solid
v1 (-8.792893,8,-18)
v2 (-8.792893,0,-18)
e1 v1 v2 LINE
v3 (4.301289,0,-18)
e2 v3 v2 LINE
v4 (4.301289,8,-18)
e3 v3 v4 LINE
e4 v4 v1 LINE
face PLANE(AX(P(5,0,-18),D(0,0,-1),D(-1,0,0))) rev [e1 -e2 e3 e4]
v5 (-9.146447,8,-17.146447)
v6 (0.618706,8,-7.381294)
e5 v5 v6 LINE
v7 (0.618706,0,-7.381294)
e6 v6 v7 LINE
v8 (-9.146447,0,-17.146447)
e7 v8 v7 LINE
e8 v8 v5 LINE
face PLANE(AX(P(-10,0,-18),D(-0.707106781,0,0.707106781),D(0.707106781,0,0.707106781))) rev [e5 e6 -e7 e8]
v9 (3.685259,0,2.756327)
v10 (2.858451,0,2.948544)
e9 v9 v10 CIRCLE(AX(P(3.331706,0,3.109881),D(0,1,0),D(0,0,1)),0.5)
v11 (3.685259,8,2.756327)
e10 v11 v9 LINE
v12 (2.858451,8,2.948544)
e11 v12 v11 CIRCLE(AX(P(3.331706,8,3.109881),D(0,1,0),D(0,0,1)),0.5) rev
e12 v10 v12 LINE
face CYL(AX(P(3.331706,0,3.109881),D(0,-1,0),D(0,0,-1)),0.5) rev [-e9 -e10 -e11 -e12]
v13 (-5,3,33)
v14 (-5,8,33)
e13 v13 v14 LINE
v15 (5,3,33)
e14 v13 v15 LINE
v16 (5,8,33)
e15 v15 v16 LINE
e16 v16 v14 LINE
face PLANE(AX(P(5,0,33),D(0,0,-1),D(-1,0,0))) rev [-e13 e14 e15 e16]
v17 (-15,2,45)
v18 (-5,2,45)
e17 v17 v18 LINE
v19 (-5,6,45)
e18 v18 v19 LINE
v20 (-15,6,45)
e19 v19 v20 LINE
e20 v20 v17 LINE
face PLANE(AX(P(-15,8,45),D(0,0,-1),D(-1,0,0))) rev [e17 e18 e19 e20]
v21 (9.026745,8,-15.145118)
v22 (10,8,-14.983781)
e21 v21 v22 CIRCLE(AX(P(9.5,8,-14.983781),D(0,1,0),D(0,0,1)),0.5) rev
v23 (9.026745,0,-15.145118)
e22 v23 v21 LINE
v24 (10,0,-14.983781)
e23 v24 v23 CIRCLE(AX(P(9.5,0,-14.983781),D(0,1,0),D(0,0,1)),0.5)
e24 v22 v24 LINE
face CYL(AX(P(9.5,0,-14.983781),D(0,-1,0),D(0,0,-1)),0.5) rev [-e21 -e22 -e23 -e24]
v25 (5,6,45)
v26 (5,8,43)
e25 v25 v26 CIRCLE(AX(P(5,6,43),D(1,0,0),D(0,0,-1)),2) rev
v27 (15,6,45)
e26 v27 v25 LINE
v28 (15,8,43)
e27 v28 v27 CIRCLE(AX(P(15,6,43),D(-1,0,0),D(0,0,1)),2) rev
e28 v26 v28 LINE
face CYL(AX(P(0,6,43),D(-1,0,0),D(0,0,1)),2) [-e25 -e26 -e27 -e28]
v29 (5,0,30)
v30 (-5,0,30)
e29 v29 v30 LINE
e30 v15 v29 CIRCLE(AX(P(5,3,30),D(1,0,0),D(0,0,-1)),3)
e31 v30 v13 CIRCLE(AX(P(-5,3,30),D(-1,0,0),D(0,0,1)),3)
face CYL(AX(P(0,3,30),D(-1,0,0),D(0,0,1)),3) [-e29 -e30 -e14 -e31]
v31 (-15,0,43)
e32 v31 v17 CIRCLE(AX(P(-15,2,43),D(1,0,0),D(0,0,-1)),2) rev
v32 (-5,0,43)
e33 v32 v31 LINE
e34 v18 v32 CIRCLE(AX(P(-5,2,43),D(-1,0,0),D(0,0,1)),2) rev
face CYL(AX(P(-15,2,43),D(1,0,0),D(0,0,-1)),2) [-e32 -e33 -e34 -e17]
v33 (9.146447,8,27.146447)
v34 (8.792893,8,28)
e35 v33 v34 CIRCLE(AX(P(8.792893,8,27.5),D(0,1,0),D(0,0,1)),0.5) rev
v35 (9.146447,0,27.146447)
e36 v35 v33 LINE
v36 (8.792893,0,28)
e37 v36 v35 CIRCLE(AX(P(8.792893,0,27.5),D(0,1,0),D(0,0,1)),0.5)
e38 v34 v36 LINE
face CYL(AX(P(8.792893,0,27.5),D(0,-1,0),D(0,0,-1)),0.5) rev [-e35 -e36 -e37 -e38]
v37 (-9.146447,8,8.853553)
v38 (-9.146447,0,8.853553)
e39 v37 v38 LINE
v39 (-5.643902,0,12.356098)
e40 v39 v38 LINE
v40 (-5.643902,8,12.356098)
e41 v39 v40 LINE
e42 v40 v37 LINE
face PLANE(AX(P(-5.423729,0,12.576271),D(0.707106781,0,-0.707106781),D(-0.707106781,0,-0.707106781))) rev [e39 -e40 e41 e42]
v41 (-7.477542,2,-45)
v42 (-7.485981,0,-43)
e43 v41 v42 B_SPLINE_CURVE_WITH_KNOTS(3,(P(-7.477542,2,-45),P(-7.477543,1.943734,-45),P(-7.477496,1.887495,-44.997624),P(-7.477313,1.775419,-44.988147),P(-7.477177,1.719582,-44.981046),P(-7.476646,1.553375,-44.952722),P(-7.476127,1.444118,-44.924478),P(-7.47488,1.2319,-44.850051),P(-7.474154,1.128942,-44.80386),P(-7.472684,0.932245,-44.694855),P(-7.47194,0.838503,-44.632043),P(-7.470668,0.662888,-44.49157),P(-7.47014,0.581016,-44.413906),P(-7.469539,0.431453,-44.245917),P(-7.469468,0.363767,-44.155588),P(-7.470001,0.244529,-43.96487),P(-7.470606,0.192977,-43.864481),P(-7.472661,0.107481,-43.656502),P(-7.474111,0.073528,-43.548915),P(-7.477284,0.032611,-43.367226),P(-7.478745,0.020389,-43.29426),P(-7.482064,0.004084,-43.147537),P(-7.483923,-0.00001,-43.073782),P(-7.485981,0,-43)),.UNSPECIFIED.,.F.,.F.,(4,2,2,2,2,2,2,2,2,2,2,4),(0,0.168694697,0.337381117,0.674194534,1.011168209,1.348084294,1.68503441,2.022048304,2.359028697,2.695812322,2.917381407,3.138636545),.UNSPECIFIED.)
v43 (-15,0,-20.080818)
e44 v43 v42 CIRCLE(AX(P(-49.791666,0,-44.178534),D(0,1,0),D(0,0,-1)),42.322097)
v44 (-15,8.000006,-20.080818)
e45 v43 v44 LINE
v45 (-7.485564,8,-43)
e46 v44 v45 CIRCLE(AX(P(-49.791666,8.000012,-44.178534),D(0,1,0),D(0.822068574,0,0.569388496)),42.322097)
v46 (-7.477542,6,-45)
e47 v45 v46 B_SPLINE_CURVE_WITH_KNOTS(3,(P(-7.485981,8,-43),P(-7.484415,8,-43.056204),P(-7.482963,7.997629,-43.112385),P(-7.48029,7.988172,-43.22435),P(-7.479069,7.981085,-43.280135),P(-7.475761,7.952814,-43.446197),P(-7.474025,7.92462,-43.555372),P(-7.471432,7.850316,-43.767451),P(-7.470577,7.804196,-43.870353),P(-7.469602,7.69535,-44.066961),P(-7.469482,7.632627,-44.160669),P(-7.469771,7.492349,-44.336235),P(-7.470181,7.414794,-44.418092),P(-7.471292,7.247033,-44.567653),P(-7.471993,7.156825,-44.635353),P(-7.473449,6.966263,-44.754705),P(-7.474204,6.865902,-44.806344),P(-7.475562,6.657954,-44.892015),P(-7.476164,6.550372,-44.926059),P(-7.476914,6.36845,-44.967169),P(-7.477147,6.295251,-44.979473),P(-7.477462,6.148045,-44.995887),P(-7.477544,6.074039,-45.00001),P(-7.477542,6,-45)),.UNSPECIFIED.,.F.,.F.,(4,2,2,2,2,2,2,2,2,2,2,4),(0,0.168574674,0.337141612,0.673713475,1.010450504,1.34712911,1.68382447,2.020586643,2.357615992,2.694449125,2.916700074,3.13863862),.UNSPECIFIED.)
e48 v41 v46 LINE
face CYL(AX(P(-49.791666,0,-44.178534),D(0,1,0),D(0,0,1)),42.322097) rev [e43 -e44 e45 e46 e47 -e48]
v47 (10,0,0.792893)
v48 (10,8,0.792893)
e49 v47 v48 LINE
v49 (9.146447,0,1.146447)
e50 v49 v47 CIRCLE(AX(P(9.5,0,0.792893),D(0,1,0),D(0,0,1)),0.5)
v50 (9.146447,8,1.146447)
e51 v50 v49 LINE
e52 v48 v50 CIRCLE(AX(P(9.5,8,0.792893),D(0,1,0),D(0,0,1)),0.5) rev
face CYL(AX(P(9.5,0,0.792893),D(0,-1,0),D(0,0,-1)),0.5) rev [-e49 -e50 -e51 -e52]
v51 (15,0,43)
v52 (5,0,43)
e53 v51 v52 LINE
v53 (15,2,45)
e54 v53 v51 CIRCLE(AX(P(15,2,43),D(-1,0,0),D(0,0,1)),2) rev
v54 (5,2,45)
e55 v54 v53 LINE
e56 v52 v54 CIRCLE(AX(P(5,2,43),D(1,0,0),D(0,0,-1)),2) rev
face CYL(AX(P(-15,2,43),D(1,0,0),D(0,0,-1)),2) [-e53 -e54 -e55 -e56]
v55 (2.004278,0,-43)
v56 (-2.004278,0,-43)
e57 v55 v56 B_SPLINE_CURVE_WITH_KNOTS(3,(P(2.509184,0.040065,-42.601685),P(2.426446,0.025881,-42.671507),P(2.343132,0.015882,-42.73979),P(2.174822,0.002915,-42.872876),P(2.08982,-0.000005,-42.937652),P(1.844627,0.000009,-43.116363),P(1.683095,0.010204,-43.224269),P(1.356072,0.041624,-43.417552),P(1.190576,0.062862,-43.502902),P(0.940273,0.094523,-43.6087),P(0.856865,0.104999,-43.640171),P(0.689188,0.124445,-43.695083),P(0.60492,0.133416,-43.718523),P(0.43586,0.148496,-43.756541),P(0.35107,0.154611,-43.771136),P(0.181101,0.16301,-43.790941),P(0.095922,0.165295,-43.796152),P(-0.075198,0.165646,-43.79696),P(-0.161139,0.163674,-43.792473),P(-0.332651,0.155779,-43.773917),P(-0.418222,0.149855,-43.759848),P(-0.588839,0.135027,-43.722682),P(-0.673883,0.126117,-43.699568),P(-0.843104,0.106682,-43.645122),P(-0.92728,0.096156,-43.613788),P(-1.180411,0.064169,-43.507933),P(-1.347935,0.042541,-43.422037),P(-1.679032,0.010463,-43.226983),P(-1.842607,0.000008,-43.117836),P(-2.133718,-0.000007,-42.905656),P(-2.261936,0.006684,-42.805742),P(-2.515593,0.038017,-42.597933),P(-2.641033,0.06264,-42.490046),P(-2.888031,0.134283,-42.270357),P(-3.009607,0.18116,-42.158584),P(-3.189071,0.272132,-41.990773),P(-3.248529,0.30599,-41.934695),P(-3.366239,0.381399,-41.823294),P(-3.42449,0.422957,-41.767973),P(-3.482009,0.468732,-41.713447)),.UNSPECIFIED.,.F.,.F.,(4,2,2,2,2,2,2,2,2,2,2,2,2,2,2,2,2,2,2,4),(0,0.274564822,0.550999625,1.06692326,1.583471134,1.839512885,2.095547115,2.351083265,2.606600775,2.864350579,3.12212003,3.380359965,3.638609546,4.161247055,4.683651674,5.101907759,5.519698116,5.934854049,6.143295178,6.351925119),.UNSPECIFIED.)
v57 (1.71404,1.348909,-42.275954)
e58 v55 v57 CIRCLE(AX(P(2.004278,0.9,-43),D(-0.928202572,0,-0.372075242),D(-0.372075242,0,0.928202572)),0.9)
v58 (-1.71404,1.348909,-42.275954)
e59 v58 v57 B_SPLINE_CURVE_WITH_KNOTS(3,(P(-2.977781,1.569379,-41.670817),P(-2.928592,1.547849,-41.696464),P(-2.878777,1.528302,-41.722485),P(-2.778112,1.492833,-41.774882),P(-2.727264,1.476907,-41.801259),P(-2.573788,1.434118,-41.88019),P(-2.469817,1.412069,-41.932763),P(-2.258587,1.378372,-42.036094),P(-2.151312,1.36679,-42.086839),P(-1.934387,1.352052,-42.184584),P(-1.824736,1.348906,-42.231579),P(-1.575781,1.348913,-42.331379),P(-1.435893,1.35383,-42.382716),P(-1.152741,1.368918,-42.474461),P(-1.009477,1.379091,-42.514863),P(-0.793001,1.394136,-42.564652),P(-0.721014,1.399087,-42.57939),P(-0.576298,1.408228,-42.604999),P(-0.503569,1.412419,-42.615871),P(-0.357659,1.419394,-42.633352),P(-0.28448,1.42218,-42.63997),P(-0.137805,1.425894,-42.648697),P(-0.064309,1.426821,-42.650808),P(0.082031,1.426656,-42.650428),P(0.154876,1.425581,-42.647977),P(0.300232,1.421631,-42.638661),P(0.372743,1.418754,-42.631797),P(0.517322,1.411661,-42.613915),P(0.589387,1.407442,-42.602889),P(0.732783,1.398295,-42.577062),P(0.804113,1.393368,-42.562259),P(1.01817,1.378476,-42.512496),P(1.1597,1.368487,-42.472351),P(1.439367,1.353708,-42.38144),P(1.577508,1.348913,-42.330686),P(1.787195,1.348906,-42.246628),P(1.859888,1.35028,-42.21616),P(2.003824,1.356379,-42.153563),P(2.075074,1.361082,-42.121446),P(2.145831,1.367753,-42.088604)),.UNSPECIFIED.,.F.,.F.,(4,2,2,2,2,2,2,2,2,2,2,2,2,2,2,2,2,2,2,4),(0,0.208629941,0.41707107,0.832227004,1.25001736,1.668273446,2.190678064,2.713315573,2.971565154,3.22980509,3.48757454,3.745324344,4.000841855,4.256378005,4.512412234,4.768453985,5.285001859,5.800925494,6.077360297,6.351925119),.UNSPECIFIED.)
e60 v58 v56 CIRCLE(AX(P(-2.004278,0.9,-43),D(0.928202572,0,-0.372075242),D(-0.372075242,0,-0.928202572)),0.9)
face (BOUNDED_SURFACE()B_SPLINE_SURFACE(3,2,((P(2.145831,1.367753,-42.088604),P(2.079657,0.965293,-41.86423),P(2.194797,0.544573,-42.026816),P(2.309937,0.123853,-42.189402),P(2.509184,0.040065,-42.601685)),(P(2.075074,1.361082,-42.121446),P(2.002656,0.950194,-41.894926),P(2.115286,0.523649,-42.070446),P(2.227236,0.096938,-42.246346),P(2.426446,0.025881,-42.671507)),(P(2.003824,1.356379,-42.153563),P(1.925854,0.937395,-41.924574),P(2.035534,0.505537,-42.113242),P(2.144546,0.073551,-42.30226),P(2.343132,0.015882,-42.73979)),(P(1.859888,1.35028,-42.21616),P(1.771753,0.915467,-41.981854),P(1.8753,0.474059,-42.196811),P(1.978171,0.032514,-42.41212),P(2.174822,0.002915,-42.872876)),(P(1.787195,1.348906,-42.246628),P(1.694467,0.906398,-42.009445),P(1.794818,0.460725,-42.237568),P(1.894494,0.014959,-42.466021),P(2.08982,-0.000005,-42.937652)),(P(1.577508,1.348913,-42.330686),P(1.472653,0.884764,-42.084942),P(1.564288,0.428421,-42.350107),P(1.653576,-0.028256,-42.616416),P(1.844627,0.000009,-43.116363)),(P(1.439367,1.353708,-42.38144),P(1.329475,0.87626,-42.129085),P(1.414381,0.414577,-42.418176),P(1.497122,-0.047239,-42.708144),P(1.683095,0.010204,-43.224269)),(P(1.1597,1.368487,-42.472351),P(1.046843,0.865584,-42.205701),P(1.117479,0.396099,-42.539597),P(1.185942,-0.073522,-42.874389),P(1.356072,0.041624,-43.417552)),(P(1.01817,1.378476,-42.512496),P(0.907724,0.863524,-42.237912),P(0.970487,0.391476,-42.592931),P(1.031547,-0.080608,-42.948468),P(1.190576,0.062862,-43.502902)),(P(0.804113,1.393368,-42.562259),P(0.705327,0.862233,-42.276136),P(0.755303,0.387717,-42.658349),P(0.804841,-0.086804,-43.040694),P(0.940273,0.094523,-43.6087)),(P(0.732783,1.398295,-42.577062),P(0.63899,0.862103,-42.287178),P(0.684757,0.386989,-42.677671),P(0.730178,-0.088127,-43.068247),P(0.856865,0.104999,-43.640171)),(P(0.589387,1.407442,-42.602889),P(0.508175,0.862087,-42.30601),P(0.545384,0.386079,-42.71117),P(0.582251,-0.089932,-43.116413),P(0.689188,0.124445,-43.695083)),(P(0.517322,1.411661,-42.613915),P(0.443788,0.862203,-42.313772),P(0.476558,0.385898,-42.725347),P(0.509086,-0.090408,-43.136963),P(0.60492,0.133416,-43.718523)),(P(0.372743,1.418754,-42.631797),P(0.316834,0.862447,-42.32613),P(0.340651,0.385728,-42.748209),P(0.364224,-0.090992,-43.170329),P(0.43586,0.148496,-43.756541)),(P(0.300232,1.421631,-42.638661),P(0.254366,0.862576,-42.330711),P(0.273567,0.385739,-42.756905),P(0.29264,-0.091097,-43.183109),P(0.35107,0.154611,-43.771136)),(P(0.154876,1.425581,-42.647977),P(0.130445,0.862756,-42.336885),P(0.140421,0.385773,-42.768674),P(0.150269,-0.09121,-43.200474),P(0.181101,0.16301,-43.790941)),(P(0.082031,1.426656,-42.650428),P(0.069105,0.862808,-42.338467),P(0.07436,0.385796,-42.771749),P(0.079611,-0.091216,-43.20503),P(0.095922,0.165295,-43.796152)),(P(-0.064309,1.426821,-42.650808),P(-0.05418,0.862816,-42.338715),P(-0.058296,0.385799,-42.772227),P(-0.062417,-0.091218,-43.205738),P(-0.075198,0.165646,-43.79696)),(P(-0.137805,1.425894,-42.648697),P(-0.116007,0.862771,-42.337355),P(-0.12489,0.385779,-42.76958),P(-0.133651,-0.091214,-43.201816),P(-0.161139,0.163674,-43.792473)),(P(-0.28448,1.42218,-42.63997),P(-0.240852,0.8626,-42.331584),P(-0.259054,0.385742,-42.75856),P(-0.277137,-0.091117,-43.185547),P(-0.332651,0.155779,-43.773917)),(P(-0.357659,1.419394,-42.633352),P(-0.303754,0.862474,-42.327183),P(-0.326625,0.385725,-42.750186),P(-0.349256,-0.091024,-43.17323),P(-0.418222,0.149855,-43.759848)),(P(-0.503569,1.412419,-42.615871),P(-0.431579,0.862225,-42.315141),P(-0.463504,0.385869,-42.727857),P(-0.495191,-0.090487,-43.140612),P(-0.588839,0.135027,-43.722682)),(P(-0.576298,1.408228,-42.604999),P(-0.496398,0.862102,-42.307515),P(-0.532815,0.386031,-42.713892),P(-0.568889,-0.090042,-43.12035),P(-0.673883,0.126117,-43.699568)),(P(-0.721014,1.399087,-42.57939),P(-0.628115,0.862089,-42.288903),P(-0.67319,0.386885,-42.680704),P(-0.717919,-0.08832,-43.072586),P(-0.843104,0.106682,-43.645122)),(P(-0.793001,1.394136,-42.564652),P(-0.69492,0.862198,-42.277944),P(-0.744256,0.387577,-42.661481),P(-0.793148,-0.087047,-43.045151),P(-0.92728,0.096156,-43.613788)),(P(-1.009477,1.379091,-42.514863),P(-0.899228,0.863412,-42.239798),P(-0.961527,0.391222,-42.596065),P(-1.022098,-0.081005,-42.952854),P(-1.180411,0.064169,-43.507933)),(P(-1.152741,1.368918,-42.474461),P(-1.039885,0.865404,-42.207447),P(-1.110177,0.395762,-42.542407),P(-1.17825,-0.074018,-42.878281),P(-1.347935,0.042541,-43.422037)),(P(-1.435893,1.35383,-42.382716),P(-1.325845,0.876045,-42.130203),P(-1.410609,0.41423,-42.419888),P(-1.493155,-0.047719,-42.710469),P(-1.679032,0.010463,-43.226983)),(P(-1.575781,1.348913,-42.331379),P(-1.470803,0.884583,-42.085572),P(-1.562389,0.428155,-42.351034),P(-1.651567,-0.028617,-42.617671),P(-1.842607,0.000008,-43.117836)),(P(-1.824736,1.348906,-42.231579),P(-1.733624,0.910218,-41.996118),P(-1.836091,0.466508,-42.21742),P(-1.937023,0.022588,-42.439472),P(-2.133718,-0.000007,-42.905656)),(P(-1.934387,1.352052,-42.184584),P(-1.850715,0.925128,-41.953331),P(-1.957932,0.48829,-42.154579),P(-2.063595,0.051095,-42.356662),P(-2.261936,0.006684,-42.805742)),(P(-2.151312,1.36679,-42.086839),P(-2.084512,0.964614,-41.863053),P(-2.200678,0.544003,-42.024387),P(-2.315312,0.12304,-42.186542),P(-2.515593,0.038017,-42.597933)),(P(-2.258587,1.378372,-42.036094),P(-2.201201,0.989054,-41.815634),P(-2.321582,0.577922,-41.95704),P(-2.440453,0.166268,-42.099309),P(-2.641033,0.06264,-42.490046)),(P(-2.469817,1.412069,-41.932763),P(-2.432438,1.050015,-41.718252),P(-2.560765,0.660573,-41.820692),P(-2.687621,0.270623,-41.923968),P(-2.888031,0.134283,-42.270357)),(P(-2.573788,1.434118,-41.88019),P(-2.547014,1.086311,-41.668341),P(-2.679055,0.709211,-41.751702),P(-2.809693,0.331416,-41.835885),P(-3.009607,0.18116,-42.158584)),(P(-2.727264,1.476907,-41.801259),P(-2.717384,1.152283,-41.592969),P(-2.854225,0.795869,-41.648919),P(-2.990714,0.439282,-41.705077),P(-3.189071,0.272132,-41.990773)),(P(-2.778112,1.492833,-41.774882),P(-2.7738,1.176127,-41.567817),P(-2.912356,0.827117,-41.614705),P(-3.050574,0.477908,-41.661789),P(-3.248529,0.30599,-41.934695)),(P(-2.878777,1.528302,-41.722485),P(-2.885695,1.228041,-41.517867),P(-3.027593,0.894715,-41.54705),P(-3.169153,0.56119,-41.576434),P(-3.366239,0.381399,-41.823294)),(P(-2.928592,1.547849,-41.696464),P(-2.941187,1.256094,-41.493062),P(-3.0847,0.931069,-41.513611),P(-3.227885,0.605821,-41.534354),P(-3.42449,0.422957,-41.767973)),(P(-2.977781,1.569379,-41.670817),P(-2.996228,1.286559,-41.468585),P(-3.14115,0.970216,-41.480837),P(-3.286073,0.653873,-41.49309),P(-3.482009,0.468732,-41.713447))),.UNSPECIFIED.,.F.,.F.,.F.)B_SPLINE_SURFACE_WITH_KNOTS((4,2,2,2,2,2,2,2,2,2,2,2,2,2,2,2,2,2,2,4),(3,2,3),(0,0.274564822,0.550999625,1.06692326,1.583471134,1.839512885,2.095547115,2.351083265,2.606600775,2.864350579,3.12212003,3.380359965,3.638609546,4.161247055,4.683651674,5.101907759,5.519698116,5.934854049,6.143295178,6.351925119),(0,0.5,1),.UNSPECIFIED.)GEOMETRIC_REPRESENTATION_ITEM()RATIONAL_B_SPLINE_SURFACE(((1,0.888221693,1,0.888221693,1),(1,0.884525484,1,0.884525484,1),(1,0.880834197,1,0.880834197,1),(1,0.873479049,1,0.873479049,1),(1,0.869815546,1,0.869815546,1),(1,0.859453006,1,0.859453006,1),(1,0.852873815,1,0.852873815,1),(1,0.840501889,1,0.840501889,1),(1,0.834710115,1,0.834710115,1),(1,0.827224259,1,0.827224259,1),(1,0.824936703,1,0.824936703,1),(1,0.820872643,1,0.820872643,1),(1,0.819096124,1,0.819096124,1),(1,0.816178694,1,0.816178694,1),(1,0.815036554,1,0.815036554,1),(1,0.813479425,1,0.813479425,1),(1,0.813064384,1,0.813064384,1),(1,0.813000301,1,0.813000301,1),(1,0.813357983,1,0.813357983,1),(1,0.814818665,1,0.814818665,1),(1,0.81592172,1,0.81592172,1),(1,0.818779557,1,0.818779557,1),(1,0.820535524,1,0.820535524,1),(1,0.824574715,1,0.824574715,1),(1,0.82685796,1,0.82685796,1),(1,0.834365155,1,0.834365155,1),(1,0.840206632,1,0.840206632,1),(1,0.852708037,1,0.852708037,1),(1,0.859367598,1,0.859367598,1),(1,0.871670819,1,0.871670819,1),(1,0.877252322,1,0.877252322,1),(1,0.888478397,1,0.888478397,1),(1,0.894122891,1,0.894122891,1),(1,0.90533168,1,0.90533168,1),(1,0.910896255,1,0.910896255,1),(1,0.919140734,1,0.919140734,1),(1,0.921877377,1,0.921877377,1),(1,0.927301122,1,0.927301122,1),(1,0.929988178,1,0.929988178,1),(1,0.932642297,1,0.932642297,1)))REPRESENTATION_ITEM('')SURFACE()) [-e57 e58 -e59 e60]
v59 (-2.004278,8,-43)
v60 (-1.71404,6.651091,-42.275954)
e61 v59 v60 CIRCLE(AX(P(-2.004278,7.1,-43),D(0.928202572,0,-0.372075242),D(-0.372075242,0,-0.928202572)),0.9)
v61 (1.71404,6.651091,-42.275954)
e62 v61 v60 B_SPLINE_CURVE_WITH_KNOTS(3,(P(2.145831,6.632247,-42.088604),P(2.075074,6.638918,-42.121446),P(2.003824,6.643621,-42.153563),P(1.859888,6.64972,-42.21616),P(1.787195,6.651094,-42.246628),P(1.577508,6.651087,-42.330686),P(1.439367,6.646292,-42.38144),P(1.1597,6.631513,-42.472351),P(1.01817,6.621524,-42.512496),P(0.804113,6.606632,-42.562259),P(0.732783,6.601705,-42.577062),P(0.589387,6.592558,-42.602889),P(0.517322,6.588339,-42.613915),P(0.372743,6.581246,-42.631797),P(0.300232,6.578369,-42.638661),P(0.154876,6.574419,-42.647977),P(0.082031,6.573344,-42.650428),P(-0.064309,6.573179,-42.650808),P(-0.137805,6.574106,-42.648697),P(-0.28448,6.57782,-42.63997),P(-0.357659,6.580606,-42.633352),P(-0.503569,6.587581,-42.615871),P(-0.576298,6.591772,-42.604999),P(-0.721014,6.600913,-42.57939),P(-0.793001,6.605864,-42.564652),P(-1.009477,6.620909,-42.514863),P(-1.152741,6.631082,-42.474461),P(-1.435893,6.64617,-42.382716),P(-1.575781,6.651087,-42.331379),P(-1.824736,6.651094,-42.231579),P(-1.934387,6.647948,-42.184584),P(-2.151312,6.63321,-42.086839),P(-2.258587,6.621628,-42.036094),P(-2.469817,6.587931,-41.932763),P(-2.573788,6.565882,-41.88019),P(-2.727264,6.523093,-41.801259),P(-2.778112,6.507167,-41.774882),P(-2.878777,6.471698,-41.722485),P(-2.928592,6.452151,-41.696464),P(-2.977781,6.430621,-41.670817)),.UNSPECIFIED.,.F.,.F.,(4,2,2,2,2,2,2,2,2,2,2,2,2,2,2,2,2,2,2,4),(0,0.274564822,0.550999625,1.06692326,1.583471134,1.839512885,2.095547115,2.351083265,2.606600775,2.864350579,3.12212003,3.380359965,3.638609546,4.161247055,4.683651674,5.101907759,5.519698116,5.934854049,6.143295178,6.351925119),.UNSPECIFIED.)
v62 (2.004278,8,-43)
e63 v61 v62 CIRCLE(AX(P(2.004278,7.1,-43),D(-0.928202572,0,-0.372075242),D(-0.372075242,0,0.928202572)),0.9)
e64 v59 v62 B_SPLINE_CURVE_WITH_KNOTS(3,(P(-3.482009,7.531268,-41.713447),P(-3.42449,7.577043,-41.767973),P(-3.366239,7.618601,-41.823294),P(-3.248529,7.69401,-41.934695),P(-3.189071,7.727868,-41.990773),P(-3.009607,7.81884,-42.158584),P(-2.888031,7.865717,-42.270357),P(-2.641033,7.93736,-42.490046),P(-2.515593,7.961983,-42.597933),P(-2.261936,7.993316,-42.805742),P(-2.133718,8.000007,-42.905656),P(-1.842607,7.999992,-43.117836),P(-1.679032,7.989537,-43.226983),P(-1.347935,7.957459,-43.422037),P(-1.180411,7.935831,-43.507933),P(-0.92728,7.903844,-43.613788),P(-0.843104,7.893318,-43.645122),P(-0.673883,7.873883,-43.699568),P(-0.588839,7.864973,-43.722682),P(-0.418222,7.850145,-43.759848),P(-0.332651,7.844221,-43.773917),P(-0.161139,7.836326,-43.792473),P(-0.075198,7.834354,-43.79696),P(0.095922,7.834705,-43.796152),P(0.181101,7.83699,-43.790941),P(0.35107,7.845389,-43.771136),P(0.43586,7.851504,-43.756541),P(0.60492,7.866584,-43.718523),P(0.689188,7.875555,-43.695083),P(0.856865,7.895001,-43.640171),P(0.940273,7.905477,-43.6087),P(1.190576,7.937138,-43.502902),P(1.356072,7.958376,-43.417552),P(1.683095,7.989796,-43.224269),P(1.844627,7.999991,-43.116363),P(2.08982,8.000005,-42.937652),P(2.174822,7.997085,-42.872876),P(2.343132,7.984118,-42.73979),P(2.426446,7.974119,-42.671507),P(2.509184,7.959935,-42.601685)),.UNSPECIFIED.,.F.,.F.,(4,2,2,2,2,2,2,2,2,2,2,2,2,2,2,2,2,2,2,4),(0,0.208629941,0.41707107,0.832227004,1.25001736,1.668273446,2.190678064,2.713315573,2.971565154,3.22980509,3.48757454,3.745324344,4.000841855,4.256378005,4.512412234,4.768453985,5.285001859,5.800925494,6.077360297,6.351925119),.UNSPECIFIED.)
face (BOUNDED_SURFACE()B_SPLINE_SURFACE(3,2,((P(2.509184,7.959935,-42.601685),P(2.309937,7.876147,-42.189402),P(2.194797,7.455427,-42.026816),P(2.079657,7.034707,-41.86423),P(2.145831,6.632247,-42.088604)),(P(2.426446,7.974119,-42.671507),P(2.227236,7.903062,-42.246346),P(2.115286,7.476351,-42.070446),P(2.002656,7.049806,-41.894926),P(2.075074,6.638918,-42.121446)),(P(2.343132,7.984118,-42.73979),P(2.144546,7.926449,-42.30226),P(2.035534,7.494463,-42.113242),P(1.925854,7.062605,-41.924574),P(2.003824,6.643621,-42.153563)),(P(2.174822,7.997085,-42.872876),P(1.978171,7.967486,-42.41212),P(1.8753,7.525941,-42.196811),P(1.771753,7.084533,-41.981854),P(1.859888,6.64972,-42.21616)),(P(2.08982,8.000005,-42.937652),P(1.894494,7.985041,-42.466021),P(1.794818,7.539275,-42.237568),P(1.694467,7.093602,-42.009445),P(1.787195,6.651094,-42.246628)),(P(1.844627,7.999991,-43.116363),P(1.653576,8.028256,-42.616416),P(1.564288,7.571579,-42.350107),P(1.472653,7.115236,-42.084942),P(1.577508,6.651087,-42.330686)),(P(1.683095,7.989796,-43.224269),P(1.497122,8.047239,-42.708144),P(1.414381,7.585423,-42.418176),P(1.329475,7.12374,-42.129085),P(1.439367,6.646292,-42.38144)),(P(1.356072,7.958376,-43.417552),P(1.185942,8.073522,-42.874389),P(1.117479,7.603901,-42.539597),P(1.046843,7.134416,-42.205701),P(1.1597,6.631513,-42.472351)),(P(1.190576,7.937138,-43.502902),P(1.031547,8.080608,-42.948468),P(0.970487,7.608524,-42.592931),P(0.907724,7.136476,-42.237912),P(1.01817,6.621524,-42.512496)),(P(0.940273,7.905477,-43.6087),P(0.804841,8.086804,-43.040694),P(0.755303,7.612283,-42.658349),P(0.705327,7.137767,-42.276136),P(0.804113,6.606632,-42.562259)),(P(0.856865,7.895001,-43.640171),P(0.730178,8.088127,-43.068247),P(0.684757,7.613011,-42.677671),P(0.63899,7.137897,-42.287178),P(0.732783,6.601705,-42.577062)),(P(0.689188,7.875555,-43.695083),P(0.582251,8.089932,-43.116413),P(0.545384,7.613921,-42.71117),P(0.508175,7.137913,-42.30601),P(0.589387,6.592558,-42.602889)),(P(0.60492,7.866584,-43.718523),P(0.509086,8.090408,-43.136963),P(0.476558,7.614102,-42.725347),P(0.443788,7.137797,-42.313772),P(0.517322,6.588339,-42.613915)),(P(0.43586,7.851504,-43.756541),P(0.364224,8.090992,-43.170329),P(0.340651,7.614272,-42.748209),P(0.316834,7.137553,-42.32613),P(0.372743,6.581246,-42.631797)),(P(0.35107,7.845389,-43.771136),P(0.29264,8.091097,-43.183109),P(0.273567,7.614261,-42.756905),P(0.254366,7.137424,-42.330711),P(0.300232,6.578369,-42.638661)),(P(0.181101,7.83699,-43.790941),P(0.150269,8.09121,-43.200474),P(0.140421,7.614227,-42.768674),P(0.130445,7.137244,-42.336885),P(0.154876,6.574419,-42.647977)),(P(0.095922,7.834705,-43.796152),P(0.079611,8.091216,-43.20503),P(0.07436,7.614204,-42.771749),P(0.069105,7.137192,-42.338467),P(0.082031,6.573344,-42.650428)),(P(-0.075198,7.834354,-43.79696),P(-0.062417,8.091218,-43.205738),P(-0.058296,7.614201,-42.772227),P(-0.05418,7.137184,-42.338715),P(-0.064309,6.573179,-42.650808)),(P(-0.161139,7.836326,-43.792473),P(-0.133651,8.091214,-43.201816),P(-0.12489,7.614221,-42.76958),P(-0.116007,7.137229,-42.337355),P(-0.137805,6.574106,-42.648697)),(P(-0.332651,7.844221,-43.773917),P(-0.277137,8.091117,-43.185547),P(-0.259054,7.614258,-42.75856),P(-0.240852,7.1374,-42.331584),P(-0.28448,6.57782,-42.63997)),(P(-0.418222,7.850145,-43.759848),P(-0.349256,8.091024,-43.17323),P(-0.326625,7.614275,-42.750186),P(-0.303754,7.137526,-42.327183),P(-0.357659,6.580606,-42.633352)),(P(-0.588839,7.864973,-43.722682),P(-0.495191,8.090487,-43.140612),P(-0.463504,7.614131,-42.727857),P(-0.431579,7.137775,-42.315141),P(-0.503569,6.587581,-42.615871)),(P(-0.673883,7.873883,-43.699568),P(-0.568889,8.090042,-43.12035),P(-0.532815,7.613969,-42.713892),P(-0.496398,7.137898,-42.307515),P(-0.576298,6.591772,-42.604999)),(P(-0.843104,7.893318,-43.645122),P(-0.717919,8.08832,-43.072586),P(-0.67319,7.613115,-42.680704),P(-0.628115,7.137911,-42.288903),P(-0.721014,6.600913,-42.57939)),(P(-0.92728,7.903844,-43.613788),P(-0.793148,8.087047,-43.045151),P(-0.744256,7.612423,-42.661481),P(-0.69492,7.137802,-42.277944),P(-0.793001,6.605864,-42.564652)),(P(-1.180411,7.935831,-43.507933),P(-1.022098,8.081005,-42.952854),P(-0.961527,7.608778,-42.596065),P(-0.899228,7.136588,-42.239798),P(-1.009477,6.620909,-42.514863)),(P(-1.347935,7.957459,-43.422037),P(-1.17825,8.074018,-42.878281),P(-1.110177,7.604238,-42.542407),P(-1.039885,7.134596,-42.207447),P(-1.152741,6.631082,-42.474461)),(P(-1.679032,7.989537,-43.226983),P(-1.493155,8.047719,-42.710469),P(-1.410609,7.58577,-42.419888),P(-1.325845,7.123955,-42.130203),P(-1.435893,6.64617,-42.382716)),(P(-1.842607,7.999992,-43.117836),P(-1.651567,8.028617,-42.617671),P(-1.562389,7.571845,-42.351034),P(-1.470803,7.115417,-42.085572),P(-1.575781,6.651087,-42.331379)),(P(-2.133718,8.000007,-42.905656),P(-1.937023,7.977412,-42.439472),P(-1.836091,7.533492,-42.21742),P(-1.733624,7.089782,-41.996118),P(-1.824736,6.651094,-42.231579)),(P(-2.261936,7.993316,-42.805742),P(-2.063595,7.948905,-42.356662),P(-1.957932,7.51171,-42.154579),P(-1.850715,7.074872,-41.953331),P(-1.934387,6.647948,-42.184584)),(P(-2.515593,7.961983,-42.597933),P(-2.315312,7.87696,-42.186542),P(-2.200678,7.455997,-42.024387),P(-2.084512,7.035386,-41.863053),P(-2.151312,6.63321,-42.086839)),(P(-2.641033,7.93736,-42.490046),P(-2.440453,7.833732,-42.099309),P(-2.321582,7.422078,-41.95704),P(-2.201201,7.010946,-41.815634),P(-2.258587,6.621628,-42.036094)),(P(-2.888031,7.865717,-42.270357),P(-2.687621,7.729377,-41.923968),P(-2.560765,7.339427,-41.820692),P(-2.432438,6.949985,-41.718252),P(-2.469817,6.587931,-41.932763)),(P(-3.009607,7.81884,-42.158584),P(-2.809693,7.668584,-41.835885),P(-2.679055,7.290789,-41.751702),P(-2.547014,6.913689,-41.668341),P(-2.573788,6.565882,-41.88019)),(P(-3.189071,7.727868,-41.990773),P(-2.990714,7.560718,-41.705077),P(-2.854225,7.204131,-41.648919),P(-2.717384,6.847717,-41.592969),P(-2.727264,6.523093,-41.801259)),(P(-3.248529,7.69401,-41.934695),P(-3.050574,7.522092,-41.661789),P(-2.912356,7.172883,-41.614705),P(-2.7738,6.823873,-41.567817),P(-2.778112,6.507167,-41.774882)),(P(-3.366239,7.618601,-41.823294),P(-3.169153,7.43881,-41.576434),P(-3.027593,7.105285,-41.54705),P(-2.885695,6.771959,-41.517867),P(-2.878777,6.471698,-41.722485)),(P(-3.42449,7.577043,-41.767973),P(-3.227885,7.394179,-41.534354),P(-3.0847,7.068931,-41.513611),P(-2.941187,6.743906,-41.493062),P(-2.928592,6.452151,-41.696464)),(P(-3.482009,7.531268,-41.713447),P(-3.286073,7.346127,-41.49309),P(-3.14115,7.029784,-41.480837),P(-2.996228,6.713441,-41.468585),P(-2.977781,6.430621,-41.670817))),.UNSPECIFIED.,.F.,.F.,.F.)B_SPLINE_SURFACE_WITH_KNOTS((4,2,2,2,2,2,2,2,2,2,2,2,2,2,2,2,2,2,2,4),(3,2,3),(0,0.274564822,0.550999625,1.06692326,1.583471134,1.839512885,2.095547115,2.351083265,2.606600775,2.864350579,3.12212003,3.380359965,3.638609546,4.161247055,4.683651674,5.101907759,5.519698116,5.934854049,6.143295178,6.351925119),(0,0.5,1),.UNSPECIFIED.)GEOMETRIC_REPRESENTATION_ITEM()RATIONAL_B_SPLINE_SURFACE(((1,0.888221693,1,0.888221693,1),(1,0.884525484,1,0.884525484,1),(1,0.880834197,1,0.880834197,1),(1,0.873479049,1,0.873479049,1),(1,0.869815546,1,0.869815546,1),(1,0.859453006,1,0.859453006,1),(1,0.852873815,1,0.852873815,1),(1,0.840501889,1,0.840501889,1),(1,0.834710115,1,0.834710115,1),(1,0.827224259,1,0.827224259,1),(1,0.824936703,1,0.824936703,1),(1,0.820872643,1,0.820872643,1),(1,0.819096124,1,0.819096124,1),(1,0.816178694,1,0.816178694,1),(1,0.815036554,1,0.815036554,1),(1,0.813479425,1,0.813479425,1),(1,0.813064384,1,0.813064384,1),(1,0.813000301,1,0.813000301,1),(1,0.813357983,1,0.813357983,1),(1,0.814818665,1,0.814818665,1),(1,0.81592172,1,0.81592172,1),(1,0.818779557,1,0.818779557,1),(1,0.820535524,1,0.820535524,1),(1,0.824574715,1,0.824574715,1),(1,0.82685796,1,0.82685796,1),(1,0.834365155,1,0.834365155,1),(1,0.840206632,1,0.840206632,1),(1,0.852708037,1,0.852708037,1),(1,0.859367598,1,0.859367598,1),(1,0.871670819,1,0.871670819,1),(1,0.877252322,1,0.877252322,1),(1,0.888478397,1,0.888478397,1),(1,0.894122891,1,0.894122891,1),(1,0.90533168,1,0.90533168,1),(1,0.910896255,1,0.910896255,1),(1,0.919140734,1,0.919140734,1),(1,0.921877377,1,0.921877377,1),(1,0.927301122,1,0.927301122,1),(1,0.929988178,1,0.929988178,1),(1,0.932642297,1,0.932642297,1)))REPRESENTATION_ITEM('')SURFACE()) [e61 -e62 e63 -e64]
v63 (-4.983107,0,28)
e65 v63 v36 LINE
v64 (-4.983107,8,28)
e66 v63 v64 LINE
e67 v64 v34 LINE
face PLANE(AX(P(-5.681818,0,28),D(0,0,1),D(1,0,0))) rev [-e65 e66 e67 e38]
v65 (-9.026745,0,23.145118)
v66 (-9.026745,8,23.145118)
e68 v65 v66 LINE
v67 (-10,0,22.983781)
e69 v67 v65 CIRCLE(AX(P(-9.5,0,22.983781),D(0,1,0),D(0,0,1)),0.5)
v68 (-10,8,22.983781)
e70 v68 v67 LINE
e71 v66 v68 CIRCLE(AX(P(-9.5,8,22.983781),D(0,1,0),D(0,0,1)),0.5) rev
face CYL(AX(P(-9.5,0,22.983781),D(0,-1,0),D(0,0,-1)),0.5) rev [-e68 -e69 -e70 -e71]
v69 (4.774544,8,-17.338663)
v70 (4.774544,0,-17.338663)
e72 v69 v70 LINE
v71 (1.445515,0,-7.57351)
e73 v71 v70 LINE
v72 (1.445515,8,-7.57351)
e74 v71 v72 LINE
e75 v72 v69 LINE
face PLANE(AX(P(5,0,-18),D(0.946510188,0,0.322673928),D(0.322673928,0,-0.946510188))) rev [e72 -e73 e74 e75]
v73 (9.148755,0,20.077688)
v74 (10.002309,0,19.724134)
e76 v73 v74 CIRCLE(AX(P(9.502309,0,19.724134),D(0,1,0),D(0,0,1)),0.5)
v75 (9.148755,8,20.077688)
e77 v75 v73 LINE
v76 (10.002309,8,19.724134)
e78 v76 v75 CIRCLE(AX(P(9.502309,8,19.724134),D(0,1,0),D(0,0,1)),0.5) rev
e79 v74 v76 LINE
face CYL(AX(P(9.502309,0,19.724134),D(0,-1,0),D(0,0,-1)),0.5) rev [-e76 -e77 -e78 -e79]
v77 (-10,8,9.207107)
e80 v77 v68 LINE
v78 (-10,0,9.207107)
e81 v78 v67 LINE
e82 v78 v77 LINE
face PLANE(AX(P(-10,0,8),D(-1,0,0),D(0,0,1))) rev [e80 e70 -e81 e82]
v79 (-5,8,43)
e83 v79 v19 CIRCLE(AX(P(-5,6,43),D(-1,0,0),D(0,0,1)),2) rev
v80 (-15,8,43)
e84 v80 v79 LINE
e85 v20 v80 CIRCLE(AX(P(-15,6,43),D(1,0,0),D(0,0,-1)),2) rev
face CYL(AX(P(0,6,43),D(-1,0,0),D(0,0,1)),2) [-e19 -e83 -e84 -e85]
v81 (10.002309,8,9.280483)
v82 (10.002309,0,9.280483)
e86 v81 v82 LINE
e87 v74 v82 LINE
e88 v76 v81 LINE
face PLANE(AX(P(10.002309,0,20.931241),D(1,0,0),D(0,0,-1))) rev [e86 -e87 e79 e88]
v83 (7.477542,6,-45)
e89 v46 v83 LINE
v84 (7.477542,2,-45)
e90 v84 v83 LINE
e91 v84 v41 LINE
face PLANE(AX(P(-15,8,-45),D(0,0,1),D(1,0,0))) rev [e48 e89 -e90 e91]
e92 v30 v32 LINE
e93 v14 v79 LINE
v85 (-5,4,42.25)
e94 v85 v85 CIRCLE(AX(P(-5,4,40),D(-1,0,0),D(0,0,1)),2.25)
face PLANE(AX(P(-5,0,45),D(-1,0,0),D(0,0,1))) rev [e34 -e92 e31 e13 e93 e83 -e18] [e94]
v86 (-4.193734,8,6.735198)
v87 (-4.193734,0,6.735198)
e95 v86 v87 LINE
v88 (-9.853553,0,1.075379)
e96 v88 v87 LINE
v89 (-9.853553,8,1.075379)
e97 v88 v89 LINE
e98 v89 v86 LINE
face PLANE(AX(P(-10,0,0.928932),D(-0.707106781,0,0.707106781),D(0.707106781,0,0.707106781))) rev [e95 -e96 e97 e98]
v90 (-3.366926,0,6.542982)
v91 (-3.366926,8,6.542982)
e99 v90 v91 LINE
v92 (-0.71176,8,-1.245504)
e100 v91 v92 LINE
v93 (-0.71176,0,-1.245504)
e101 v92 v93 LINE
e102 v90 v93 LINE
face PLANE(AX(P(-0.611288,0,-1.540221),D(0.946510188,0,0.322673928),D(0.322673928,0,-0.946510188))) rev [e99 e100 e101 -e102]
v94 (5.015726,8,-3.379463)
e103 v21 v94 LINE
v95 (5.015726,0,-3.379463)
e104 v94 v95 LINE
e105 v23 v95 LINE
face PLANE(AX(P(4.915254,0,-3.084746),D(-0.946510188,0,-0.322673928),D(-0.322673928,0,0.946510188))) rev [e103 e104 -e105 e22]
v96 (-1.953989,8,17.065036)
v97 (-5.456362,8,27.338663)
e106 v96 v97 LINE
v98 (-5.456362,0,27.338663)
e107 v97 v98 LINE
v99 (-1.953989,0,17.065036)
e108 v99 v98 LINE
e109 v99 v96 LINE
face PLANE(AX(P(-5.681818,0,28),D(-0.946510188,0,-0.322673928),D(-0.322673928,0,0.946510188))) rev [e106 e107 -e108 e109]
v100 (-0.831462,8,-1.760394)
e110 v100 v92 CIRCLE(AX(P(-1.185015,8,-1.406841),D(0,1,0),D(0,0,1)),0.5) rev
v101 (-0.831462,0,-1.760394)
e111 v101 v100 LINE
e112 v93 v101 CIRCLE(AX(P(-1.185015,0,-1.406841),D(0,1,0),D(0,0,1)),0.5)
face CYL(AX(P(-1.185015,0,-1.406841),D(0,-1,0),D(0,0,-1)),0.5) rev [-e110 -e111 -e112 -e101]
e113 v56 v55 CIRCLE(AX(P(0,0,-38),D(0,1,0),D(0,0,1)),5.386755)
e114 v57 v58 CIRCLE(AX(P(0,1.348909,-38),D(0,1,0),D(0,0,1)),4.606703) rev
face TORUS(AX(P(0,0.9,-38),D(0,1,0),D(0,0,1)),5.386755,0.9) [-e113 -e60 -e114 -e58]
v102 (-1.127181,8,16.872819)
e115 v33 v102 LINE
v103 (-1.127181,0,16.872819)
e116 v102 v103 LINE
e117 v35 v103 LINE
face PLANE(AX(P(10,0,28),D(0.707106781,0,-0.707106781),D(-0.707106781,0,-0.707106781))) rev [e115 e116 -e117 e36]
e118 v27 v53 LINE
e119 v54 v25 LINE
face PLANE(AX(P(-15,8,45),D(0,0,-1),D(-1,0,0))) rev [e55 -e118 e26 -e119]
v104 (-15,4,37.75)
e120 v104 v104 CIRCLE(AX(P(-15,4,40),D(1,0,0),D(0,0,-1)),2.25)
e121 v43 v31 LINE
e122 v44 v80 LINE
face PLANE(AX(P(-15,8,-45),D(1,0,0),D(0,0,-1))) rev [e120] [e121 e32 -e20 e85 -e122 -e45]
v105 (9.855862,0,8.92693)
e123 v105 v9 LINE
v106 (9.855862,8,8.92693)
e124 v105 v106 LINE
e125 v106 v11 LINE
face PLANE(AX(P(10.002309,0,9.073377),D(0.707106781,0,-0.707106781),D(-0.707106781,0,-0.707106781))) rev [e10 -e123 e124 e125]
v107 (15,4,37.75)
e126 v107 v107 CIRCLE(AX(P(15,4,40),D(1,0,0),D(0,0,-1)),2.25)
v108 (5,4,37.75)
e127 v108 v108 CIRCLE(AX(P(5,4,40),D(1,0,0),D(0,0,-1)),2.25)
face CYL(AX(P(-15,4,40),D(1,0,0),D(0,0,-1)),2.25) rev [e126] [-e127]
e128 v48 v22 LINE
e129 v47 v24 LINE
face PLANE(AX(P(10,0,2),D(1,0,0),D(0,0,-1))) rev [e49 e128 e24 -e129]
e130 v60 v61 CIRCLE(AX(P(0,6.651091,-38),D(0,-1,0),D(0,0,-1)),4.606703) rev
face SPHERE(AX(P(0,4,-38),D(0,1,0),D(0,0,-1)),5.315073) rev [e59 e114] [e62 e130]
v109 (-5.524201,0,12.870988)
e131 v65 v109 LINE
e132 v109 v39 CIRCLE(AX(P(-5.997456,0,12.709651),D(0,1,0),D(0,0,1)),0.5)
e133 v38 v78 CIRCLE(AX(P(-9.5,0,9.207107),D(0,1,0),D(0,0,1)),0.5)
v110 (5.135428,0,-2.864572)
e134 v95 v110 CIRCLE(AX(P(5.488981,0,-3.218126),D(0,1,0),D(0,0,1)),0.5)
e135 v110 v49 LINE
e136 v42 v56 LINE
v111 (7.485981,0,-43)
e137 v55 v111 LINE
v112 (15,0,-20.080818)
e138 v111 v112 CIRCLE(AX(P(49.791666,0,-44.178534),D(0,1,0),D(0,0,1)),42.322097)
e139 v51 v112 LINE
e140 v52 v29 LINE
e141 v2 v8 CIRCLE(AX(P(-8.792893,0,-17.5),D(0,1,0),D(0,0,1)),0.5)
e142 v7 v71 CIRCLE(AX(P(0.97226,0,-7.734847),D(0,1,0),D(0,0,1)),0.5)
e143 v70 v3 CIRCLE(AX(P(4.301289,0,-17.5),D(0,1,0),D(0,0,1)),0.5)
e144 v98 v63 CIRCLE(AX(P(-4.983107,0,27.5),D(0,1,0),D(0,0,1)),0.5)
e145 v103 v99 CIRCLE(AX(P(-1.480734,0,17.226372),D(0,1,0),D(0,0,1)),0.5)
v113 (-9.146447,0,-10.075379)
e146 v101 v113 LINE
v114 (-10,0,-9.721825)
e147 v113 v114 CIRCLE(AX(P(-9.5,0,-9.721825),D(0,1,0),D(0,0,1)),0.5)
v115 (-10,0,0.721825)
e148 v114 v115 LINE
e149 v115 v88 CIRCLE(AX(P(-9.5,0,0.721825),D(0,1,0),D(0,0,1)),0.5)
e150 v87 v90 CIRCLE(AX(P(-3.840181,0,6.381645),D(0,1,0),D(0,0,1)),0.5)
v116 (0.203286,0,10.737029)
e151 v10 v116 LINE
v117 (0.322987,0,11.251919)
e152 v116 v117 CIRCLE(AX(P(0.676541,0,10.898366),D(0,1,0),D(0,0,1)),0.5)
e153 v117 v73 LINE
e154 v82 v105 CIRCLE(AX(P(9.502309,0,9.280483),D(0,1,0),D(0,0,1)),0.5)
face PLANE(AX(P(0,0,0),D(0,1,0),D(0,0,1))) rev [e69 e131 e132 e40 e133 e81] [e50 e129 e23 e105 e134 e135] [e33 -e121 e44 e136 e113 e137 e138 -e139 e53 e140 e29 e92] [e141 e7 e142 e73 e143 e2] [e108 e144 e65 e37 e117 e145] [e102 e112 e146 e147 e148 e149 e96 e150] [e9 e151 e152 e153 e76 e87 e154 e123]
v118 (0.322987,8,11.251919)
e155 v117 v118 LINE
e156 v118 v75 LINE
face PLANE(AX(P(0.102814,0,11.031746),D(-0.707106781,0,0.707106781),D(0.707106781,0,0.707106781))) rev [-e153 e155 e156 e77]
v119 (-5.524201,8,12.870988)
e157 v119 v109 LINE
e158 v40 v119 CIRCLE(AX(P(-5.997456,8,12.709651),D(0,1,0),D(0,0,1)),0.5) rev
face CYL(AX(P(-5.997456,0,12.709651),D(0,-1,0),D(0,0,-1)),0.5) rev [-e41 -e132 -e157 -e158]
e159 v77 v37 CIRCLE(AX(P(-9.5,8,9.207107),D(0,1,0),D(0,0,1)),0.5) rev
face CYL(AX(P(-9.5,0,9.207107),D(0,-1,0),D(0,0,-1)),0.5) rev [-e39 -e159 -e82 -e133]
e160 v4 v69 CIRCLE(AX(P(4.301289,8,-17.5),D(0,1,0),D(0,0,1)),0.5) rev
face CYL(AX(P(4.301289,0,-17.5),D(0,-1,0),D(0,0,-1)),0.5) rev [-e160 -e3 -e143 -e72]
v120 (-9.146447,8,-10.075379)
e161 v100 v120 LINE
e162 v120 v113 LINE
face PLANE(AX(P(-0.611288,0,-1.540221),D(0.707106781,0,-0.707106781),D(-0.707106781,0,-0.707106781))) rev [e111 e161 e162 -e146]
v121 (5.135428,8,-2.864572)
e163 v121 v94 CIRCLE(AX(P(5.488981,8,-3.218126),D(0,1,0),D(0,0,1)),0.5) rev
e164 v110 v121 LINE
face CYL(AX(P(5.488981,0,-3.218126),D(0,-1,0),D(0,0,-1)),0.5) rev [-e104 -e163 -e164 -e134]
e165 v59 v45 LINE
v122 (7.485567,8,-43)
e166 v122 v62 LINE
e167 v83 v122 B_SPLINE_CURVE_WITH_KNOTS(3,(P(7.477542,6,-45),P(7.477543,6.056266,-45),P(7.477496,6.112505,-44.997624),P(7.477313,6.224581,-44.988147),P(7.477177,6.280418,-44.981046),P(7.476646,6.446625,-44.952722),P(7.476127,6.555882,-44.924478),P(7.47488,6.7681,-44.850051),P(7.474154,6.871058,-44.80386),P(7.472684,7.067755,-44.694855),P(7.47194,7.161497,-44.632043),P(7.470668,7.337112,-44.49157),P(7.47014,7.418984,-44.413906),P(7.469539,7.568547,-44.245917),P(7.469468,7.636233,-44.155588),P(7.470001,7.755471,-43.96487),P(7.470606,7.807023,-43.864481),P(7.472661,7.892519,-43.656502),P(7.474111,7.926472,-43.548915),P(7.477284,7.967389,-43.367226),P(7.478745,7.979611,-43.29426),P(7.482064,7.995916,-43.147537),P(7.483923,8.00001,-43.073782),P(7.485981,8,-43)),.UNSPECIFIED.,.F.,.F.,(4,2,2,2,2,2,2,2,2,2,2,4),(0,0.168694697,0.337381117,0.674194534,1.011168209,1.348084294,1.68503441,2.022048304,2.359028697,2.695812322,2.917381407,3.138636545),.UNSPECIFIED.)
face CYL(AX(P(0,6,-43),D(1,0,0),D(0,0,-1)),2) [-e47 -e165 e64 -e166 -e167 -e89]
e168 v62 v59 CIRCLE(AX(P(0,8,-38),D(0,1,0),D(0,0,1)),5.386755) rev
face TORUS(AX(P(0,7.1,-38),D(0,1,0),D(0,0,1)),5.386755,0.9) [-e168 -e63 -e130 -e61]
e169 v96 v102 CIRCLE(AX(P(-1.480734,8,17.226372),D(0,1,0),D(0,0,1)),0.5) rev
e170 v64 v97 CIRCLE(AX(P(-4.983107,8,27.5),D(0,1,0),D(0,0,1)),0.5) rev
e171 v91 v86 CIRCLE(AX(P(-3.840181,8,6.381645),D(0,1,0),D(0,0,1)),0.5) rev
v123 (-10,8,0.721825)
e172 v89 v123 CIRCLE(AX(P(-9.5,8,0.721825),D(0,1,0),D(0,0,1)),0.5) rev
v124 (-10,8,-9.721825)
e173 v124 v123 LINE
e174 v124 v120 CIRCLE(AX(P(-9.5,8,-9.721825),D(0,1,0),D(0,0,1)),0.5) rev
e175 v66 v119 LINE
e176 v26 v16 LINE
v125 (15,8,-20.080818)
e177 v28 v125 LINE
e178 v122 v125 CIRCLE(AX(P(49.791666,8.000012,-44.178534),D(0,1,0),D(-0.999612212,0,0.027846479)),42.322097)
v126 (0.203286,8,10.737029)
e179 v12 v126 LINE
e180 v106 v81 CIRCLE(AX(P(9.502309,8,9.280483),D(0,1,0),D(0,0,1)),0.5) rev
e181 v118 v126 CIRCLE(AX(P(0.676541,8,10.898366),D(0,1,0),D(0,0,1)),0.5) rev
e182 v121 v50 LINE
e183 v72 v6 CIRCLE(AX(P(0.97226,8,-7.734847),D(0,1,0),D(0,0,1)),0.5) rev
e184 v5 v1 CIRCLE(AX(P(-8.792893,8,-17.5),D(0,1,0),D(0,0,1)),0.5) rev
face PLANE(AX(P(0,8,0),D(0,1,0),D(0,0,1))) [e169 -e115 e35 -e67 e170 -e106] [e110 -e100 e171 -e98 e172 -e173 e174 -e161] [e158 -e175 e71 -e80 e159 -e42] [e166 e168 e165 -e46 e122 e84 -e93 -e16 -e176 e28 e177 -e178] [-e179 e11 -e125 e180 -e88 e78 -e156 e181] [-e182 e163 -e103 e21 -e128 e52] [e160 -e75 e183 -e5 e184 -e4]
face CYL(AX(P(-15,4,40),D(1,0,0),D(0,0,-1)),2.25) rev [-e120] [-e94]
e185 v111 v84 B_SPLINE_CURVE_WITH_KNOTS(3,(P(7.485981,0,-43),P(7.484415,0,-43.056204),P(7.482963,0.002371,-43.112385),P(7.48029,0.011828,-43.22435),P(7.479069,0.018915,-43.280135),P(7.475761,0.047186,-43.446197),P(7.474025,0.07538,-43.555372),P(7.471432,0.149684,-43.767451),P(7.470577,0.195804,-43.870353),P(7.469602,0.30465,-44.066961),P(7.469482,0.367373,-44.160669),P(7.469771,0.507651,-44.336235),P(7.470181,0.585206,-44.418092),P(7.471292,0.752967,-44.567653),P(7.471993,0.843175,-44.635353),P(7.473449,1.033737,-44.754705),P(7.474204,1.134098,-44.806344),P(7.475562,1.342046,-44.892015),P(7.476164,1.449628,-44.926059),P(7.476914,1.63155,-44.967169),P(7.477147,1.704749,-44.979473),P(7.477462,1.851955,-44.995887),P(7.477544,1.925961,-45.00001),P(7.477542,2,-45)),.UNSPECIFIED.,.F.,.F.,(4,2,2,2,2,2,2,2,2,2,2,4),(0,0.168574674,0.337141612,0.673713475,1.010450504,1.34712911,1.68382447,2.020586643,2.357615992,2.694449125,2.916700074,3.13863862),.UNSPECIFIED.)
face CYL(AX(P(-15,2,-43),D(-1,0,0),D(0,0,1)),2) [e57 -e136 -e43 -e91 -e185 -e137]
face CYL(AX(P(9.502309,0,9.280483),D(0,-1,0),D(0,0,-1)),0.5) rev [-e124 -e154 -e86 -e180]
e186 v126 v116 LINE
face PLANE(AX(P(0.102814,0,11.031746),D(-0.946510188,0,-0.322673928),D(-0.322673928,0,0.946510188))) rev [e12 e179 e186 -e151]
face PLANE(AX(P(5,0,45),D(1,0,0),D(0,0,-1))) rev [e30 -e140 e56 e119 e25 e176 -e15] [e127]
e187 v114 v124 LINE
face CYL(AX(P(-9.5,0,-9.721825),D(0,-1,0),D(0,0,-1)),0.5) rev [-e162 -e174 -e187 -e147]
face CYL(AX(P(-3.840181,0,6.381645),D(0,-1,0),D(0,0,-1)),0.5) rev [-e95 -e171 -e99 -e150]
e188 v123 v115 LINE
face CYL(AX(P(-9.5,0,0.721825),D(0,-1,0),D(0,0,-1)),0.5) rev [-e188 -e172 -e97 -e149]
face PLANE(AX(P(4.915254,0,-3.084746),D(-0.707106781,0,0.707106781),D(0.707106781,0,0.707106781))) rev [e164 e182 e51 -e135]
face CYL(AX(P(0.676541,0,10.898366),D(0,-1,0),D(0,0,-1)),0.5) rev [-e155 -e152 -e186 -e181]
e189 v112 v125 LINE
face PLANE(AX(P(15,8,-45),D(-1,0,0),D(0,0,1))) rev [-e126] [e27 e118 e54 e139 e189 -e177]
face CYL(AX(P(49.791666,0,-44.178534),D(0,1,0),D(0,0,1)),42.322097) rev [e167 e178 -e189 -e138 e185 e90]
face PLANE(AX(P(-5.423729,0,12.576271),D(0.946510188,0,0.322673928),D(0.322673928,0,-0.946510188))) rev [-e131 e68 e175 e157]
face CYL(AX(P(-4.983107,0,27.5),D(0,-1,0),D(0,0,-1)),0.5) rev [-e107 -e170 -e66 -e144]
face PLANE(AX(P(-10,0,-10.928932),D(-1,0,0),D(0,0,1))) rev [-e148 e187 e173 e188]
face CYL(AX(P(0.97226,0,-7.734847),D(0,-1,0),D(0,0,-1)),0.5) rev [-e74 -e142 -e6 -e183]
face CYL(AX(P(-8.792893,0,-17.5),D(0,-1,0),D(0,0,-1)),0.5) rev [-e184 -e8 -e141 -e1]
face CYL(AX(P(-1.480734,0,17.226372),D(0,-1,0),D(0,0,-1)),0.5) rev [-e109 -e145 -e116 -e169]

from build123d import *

# Parameters (mm, degrees)
SKETCH1_W               = 30
SKETCH1_H               = 90
BOSS_EXTRUDE1_DEPTH     = 8
SKETCH2_W               = 10
SKETCH2_H               = 12
CUT_EXTRUDE1_DEPTH      = 8
SKETCH3_R               = 2.25
CUT_EXTRUDE2_DEPTH      = 55.671747731
FILLET1_R               = 2
CUT_EXTRUDE3_DEPTH      = 49.104053883
FILLET2_R               = 3
FILLET3_R               = 0.9
CUT_EXTRUDE4_DEPTH      = 49.104054025
CUT_EXTRUDE4_DEPTH_BACK = 49.104054025
FILLET4_R               = 0.5


with BuildPart() as part:
    # Sketch1 → Boss-Extrude1 (new body)
    with BuildSketch(Plane(origin=(0, 0, 0), x_dir=(1, 0, 0), z_dir=(0, 1, 0))):
        Rectangle(SKETCH1_W, SKETCH1_H)
    extrude(amount=BOSS_EXTRUDE1_DEPTH)

    # Sketch2 → Cut-Extrude1 (cut)
    with BuildSketch(Plane(origin=(0, 8, 0), x_dir=(1, 0, 0), z_dir=(0, 1, 0))):
        with Locations((0, -39)):
            Rectangle(SKETCH2_W, SKETCH2_H)
    extrude(amount=-CUT_EXTRUDE1_DEPTH, mode=Mode.SUBTRACT)

    # Sketch3 → Cut-Extrude2 (cut, through all)
    with BuildSketch(Plane(origin=(15, 0, 0), x_dir=(0, 0, -1), z_dir=(1, 0, 0))):
        with Locations((-40, 4)):
            Circle(SKETCH3_R)
    extrude(amount=-CUT_EXTRUDE2_DEPTH, mode=Mode.SUBTRACT)

    # Fillet1
    fillet1_edges = [part.edges().sort_by_distance(p)[0] for p in [
        (10, 0, 45),
        (-10, 8, 45),
        (10, 8, 45),
        (-10, 0, 45),
        (0, 0, -45),
        (0, 8, -45),
    ]]
    fillet(fillet1_edges, radius=FILLET1_R)

    # Sketch4 → Cut-Extrude3 (cut, through all)
    with BuildSketch(Plane(origin=(0, 8, 0), x_dir=(1, 0, 0), z_dir=(0, 1, 0))):
        Polygon((5, 18), (-10, 18), (1.186440678, 6.813559322), align=None)
        Polygon((10, -2), (10, 18), (4.915254237, 3.084745763), align=None)
        Polygon((-10, -8), (-10, -26), (-5.423728814, -12.576271186), align=None)
        Polygon((-5.681818182, -28), (10, -28), (-1.694915254, -16.305084746), align=None)
        Polygon((-10, 10.928932188), (-10, -0.928932188), (-3.625999709, -7.302932479), (-0.611288427, 1.540220615), align=None)
        Polygon((10.002308787, -20.931240975), (10.002308787, -9.073376599), (3.117525133, -2.188592944), (0.10281385, -11.031746039), align=None)
    extrude(amount=-CUT_EXTRUDE3_DEPTH, mode=Mode.SUBTRACT)

    # Fillet2
    fillet2_edges = [part.edges().sort_by_distance(p)[0] for p in [
        (0, 0, 33),
    ]]
    fillet(fillet2_edges, radius=FILLET2_R)

    # Sketch5 → Cut-Revolve1 (revolve, cut)
    with BuildSketch(Plane(origin=(0, 0, 0), x_dir=(0, 0, -1), z_dir=(1, 0, 0))):
        with BuildLine():
            Line((41.5, 8), (38, 8))
            Line((38, 8), (38, 0))
            Line((38, 0), (41.5, 0))
            ThreePointArc((41.5, 0), (43.315072906, 4), (41.5, 8))
        make_face()
    revolve(axis=Axis((0, 8, -38), (0, -1, 0)), mode=Mode.SUBTRACT)

    # Fillet3
    fillet3_edges = [part.edges().sort_by_distance(p)[0] for p in [
        (0, 0, -34.5),
        (0, 8, -34.5),
    ]]
    fillet(fillet3_edges, radius=FILLET3_R - 0.0004)  # a hair under: the kernel refuses the full size

    # Sketch6 → Cut-Extrude4 (cut, two sides: drawn at the far end of the back side and taken through both)
    with BuildSketch(Plane(origin=(0, 8, 0), x_dir=(1, 0, 0), z_dir=(0, 1, 0)).offset(-CUT_EXTRUDE4_DEPTH_BACK)):
        with BuildLine():
            Line((-7.477541934, 45), (-15, 45))
            Line((-15, 45), (-15, 20.080818258))
            ThreePointArc((-15, 20.080818258), (-9.275408523, 31.947720661), (-7.477541934, 45))
        make_face()
        with BuildLine():
            Line((15, 45), (15, 20.080818258))
            ThreePointArc((15, 20.080818258), (9.275408523, 31.947720661), (7.477541934, 45))
            Line((7.477541934, 45), (15, 45))
        make_face()
    extrude(amount=CUT_EXTRUDE4_DEPTH + CUT_EXTRUDE4_DEPTH_BACK, mode=Mode.SUBTRACT)

    # Fillet4
    fillet4_edges = [part.edges().sort_by_distance(p)[0] for p in [
        (-10, 4, -10.928932188),
        (-0.611288427, 4, -1.540220615),
        (-3.625999709, 4, 7.302932479),
        (-10, 4, 0.928932188),
        (-1.694915254, 4, 16.305084746),
        (10, 4, 28),
        (-5.681818182, 4, 28),
        (10, 4, 2),
        (4.915254237, 4, -3.084745763),
        (10, 4, -18),
        (-10, 4, 8),
        (-5.423728814, 4, 12.576271186),
        (-10, 4, 26),
        (10.002308787, 4, 20.931240975),
        (0.10281385, 4, 11.031746039),
        (3.117525133, 4, 2.188592944),
        (10.002308787, 4, 9.073376599),
        (5, 4, -18),
        (1.186440678, 4, -6.813559322),
        (-10, 4, -18),
    ]]
    fillet(fillet4_edges, radius=FILLET4_R)


solid = part.part
